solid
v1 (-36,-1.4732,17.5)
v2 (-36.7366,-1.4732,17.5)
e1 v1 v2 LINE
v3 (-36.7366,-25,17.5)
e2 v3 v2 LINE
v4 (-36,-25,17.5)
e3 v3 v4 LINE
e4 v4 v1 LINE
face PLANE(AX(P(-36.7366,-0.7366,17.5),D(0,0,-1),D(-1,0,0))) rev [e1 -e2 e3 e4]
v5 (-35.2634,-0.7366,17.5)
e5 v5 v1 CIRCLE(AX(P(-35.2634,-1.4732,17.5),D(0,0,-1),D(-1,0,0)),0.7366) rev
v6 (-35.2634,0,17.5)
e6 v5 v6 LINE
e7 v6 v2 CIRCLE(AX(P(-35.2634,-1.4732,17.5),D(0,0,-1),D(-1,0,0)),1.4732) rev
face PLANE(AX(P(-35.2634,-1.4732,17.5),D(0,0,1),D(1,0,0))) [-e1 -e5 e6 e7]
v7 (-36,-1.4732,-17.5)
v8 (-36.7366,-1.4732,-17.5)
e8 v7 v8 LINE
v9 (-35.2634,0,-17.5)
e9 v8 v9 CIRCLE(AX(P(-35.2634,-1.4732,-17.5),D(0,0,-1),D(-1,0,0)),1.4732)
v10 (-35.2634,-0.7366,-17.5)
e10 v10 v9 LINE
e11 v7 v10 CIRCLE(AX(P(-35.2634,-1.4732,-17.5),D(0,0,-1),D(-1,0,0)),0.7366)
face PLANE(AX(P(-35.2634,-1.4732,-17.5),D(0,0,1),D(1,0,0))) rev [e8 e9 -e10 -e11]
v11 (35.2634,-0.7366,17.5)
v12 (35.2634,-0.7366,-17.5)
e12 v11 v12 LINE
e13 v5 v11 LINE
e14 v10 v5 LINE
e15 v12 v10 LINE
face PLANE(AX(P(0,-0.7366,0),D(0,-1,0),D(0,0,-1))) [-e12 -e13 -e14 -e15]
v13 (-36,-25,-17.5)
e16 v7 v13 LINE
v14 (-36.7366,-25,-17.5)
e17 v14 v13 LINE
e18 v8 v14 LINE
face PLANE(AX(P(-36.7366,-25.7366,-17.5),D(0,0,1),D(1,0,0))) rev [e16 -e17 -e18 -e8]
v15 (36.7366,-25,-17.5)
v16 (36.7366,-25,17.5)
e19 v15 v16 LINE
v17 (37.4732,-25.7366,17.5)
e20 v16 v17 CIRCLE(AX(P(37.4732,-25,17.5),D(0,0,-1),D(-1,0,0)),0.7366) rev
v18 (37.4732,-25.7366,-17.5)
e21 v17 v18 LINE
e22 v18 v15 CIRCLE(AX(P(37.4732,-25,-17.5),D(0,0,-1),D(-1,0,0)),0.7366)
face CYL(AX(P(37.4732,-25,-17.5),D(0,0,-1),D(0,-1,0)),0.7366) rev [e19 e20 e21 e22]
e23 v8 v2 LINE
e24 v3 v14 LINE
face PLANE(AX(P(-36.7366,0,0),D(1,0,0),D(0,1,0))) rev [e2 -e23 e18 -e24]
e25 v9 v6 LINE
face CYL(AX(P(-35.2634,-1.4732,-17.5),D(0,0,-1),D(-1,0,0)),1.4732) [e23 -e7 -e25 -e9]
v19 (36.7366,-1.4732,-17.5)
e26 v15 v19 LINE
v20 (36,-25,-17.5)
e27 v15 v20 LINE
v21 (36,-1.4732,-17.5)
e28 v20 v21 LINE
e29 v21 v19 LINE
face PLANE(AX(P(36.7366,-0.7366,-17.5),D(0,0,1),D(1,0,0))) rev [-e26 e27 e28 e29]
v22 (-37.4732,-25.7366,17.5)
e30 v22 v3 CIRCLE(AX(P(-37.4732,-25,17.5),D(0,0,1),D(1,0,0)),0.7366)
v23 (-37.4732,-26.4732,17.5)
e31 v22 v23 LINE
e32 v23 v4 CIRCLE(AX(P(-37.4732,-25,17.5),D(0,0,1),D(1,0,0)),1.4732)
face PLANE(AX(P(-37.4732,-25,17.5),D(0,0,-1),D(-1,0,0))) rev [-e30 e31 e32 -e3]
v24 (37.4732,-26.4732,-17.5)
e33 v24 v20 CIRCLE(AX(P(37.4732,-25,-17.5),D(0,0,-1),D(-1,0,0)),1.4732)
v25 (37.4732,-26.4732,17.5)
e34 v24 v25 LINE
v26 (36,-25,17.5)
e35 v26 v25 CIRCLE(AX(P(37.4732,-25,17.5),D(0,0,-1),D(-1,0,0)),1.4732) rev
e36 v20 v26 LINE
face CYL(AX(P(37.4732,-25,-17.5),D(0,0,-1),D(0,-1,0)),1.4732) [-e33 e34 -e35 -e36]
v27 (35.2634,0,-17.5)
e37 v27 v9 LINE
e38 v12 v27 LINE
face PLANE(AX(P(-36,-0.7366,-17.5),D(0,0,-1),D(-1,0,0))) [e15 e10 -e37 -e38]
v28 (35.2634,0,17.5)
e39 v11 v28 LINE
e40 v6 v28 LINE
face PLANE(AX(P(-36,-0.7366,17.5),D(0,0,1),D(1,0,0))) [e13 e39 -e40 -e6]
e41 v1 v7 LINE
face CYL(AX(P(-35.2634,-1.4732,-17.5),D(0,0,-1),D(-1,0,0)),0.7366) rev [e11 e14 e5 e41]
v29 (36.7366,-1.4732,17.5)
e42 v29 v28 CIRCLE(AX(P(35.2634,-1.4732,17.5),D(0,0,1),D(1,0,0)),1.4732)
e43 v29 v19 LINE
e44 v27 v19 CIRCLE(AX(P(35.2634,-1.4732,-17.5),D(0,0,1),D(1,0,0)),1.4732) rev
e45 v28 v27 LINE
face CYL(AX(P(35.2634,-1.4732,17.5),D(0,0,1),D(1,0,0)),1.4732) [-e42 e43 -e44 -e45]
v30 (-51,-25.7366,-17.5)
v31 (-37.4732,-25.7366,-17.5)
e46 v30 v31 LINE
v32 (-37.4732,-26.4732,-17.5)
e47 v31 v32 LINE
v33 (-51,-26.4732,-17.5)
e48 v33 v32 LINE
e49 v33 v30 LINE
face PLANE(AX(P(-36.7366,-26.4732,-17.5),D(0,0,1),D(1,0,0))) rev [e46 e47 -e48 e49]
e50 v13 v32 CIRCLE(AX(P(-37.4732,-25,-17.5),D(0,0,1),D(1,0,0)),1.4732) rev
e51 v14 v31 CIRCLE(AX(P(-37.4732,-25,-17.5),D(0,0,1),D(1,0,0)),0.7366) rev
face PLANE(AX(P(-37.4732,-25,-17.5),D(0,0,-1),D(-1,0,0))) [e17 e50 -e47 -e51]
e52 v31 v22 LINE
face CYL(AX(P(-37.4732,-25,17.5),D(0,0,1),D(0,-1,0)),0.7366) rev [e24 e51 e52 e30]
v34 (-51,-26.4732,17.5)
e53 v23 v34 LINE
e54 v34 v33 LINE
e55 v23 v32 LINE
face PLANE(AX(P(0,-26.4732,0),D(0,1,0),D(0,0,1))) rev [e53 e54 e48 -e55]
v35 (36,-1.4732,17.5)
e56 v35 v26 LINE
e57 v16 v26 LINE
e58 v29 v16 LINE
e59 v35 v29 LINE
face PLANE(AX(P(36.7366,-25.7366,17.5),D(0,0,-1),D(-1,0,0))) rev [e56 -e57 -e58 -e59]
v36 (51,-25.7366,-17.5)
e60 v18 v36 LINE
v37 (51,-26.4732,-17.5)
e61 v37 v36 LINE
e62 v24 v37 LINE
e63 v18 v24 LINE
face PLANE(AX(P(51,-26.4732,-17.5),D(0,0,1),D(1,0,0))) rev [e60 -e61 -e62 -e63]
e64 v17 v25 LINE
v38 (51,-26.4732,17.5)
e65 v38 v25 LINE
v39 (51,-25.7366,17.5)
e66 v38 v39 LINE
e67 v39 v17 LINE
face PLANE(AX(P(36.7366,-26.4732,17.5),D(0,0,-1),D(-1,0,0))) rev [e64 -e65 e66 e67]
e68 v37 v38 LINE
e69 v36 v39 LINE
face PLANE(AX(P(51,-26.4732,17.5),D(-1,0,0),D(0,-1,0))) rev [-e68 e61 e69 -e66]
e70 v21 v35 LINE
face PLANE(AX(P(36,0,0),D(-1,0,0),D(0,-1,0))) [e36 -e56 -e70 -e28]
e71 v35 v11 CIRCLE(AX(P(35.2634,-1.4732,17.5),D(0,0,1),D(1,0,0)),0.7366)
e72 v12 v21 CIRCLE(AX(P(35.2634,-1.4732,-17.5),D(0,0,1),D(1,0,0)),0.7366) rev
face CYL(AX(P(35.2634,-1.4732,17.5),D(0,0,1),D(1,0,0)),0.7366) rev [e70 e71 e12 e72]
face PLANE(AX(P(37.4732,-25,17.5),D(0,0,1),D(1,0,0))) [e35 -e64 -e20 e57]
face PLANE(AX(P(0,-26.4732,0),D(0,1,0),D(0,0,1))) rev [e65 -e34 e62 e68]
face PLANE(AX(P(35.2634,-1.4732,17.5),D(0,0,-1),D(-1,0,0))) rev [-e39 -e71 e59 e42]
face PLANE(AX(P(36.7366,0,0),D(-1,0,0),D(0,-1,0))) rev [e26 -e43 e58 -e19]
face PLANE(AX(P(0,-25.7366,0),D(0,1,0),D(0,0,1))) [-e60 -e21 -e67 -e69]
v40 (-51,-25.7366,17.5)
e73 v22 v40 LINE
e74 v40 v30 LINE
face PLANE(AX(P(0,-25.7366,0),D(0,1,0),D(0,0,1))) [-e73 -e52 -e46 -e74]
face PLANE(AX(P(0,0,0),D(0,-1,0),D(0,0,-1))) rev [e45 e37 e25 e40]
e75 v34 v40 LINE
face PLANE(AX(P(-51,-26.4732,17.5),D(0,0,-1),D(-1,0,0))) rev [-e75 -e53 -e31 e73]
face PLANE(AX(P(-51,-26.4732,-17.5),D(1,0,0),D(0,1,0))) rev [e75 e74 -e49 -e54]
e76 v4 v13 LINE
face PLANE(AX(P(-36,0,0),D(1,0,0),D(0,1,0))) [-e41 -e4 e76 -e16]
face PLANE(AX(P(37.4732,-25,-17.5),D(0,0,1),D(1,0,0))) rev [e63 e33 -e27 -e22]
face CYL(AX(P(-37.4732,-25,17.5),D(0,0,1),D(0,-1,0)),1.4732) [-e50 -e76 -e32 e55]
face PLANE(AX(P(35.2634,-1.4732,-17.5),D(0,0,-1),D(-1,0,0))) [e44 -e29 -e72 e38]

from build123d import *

# Parameters (mm, degrees)
SKETCH1_W                      = 72
SKETCH1_H                      = 35
BASE_FLANGE1_DEPTH             = 0.7366
EDGE_FLANGE1_STRIP_W           = 4.4196
EDGE_FLANGE1_STRIP_H           = 0.7366
EDGE_FLANGE1_STRIP_CUT_DEPTH   = 35
EDGE_FLANGE1_STRIP_2_W         = 4.4196
EDGE_FLANGE1_STRIP_2_H         = 0.7366
EDGE_FLANGE1_STRIP_CUT_2_DEPTH = 35
EDGE_FLANGE1_DEPTH             = 35
EDGE_FLANGE1_BEND_DEPTH        = 35
EDGE_FLANGE2_STRIP_W           = 4.4196
EDGE_FLANGE2_STRIP_H           = 0.7366
EDGE_FLANGE2_STRIP_CUT_DEPTH   = 35
EDGE_FLANGE2_STRIP_2_W         = 4.4196
EDGE_FLANGE2_STRIP_2_H         = 0.7366
EDGE_FLANGE2_STRIP_CUT_2_DEPTH = 35
EDGE_FLANGE2_DEPTH             = 35
EDGE_FLANGE2_BEND_DEPTH        = 35


# Sheet-metal steps are written as plain solids
with BuildPart() as part:
    # Sketch1 → Base-Flange1 (new body)
    with BuildSketch(Plane(origin=(0, 0, 0), x_dir=(1, 0, 0), z_dir=(0, 1, 0))):
        Rectangle(SKETCH1_W, SKETCH1_H)
    extrude(amount=-BASE_FLANGE1_DEPTH)

    # Edge-Flange1 strip (across the edge) → Edge-Flange1 strip cut (cut)
    with BuildSketch(Plane(origin=(36, -0.7366, -17.5), x_dir=(-1, 0, 0), z_dir=(0, 0, 1))):
        with Locations((-1.4732, -0.3683)):
            Rectangle(EDGE_FLANGE1_STRIP_W, EDGE_FLANGE1_STRIP_H)
    extrude(amount=EDGE_FLANGE1_STRIP_CUT_DEPTH, mode=Mode.SUBTRACT)

    # Edge-Flange1 strip 2 (across the edge) → Edge-Flange1 strip cut 2 (cut)
    with BuildSketch(Plane(origin=(-36, -0.7366, 17.5), x_dir=(1, 0, 0), z_dir=(0, 0, -1))):
        with Locations((-1.4732, -0.3683)):
            Rectangle(EDGE_FLANGE1_STRIP_2_W, EDGE_FLANGE1_STRIP_2_H)
    extrude(amount=EDGE_FLANGE1_STRIP_CUT_2_DEPTH, mode=Mode.SUBTRACT)

    # Edge-Flange1 section (across the edge) → Edge-Flange1 (add)
    with BuildSketch(Plane(origin=(36, -0.7366, -17.5), x_dir=(-1, 0, 0), z_dir=(0, 0, 1))):
        with BuildLine():
            Line((-0.7366, 0.7366), (-0.7366, 25))
            Line((-0.7366, 25), (0, 25))
            Line((0, 25), (0, 0.7366))
            ThreePointArc((0, 0.7366), (0.215745145, 0.215745145), (0.7366, 0))
            Line((0.7366, 0), (0.7366, -0.7366))
            ThreePointArc((0.7366, -0.7366), (-0.30510971, -0.30510971), (-0.7366, 0.7366))
        make_face()
    extrude(amount=EDGE_FLANGE1_DEPTH)

    # Edge-Flange1 section 2 (across the edge) → Edge-Flange1 bend (add)
    with BuildSketch(Plane(origin=(-36, -0.7366, 17.5), x_dir=(1, 0, 0), z_dir=(0, 0, -1))):
        with BuildLine():
            Line((-0.7366, 0.7366), (-0.7366, 25))
            Line((-0.7366, 25), (0, 25))
            Line((0, 25), (0, 0.7366))
            ThreePointArc((0, 0.7366), (0.215745145, 0.215745145), (0.7366, 0))
            Line((0.7366, 0), (0.7366, -0.7366))
            ThreePointArc((0.7366, -0.7366), (-0.30510971, -0.30510971), (-0.7366, 0.7366))
        make_face()
    extrude(amount=EDGE_FLANGE1_BEND_DEPTH)

    # Edge-Flange2 strip (across the edge) → Edge-Flange2 strip cut (cut)
    with BuildSketch(Plane(origin=(-36.7366, -25.7366, -17.5), x_dir=(0, 1, 0), z_dir=(0, 0, 1))):
        with Locations((-1.4732, -0.3683)):
            Rectangle(EDGE_FLANGE2_STRIP_W, EDGE_FLANGE2_STRIP_H)
    extrude(amount=EDGE_FLANGE2_STRIP_CUT_DEPTH, mode=Mode.SUBTRACT)

    # Edge-Flange2 strip 2 (across the edge) → Edge-Flange2 strip cut 2 (cut)
    with BuildSketch(Plane(origin=(36.7366, -25.7366, 17.5), x_dir=(0, 1, 0), z_dir=(0, 0, -1))):
        with Locations((-1.4732, -0.3683)):
            Rectangle(EDGE_FLANGE2_STRIP_2_W, EDGE_FLANGE2_STRIP_2_H)
    extrude(amount=EDGE_FLANGE2_STRIP_CUT_2_DEPTH, mode=Mode.SUBTRACT)

    # Edge-Flange2 section (across the edge) → Edge-Flange2 (add)
    with BuildSketch(Plane(origin=(-36.7366, -25.7366, -17.5), x_dir=(0, 1, 0), z_dir=(0, 0, 1))):
        with BuildLine():
            Line((-0.7366, 0.7366), (-0.7366, 14.2634))
            Line((-0.7366, 14.2634), (0, 14.2634))
            Line((0, 14.2634), (0, 0.7366))
            ThreePointArc((0, 0.7366), (0.215745145, 0.215745145), (0.7366, 0))
            Line((0.7366, 0), (0.7366, -0.7366))
            ThreePointArc((0.7366, -0.7366), (-0.30510971, -0.30510971), (-0.7366, 0.7366))
        make_face()
    extrude(amount=EDGE_FLANGE2_DEPTH)

    # Edge-Flange2 section 2 (across the edge) → Edge-Flange2 bend (add)
    with BuildSketch(Plane(origin=(36.7366, -25.7366, 17.5), x_dir=(0, 1, 0), z_dir=(0, 0, -1))):
        with BuildLine():
            Line((-0.7366, 0.7366), (-0.7366, 14.2634))
            Line((-0.7366, 14.2634), (0, 14.2634))
            Line((0, 14.2634), (0, 0.7366))
            ThreePointArc((0, 0.7366), (0.215745145, 0.215745145), (0.7366, 0))
            Line((0.7366, 0), (0.7366, -0.7366))
            ThreePointArc((0.7366, -0.7366), (-0.30510971, -0.30510971), (-0.7366, 0.7366))
        make_face()
    extrude(amount=EDGE_FLANGE2_BEND_DEPTH)


solid = part.part
